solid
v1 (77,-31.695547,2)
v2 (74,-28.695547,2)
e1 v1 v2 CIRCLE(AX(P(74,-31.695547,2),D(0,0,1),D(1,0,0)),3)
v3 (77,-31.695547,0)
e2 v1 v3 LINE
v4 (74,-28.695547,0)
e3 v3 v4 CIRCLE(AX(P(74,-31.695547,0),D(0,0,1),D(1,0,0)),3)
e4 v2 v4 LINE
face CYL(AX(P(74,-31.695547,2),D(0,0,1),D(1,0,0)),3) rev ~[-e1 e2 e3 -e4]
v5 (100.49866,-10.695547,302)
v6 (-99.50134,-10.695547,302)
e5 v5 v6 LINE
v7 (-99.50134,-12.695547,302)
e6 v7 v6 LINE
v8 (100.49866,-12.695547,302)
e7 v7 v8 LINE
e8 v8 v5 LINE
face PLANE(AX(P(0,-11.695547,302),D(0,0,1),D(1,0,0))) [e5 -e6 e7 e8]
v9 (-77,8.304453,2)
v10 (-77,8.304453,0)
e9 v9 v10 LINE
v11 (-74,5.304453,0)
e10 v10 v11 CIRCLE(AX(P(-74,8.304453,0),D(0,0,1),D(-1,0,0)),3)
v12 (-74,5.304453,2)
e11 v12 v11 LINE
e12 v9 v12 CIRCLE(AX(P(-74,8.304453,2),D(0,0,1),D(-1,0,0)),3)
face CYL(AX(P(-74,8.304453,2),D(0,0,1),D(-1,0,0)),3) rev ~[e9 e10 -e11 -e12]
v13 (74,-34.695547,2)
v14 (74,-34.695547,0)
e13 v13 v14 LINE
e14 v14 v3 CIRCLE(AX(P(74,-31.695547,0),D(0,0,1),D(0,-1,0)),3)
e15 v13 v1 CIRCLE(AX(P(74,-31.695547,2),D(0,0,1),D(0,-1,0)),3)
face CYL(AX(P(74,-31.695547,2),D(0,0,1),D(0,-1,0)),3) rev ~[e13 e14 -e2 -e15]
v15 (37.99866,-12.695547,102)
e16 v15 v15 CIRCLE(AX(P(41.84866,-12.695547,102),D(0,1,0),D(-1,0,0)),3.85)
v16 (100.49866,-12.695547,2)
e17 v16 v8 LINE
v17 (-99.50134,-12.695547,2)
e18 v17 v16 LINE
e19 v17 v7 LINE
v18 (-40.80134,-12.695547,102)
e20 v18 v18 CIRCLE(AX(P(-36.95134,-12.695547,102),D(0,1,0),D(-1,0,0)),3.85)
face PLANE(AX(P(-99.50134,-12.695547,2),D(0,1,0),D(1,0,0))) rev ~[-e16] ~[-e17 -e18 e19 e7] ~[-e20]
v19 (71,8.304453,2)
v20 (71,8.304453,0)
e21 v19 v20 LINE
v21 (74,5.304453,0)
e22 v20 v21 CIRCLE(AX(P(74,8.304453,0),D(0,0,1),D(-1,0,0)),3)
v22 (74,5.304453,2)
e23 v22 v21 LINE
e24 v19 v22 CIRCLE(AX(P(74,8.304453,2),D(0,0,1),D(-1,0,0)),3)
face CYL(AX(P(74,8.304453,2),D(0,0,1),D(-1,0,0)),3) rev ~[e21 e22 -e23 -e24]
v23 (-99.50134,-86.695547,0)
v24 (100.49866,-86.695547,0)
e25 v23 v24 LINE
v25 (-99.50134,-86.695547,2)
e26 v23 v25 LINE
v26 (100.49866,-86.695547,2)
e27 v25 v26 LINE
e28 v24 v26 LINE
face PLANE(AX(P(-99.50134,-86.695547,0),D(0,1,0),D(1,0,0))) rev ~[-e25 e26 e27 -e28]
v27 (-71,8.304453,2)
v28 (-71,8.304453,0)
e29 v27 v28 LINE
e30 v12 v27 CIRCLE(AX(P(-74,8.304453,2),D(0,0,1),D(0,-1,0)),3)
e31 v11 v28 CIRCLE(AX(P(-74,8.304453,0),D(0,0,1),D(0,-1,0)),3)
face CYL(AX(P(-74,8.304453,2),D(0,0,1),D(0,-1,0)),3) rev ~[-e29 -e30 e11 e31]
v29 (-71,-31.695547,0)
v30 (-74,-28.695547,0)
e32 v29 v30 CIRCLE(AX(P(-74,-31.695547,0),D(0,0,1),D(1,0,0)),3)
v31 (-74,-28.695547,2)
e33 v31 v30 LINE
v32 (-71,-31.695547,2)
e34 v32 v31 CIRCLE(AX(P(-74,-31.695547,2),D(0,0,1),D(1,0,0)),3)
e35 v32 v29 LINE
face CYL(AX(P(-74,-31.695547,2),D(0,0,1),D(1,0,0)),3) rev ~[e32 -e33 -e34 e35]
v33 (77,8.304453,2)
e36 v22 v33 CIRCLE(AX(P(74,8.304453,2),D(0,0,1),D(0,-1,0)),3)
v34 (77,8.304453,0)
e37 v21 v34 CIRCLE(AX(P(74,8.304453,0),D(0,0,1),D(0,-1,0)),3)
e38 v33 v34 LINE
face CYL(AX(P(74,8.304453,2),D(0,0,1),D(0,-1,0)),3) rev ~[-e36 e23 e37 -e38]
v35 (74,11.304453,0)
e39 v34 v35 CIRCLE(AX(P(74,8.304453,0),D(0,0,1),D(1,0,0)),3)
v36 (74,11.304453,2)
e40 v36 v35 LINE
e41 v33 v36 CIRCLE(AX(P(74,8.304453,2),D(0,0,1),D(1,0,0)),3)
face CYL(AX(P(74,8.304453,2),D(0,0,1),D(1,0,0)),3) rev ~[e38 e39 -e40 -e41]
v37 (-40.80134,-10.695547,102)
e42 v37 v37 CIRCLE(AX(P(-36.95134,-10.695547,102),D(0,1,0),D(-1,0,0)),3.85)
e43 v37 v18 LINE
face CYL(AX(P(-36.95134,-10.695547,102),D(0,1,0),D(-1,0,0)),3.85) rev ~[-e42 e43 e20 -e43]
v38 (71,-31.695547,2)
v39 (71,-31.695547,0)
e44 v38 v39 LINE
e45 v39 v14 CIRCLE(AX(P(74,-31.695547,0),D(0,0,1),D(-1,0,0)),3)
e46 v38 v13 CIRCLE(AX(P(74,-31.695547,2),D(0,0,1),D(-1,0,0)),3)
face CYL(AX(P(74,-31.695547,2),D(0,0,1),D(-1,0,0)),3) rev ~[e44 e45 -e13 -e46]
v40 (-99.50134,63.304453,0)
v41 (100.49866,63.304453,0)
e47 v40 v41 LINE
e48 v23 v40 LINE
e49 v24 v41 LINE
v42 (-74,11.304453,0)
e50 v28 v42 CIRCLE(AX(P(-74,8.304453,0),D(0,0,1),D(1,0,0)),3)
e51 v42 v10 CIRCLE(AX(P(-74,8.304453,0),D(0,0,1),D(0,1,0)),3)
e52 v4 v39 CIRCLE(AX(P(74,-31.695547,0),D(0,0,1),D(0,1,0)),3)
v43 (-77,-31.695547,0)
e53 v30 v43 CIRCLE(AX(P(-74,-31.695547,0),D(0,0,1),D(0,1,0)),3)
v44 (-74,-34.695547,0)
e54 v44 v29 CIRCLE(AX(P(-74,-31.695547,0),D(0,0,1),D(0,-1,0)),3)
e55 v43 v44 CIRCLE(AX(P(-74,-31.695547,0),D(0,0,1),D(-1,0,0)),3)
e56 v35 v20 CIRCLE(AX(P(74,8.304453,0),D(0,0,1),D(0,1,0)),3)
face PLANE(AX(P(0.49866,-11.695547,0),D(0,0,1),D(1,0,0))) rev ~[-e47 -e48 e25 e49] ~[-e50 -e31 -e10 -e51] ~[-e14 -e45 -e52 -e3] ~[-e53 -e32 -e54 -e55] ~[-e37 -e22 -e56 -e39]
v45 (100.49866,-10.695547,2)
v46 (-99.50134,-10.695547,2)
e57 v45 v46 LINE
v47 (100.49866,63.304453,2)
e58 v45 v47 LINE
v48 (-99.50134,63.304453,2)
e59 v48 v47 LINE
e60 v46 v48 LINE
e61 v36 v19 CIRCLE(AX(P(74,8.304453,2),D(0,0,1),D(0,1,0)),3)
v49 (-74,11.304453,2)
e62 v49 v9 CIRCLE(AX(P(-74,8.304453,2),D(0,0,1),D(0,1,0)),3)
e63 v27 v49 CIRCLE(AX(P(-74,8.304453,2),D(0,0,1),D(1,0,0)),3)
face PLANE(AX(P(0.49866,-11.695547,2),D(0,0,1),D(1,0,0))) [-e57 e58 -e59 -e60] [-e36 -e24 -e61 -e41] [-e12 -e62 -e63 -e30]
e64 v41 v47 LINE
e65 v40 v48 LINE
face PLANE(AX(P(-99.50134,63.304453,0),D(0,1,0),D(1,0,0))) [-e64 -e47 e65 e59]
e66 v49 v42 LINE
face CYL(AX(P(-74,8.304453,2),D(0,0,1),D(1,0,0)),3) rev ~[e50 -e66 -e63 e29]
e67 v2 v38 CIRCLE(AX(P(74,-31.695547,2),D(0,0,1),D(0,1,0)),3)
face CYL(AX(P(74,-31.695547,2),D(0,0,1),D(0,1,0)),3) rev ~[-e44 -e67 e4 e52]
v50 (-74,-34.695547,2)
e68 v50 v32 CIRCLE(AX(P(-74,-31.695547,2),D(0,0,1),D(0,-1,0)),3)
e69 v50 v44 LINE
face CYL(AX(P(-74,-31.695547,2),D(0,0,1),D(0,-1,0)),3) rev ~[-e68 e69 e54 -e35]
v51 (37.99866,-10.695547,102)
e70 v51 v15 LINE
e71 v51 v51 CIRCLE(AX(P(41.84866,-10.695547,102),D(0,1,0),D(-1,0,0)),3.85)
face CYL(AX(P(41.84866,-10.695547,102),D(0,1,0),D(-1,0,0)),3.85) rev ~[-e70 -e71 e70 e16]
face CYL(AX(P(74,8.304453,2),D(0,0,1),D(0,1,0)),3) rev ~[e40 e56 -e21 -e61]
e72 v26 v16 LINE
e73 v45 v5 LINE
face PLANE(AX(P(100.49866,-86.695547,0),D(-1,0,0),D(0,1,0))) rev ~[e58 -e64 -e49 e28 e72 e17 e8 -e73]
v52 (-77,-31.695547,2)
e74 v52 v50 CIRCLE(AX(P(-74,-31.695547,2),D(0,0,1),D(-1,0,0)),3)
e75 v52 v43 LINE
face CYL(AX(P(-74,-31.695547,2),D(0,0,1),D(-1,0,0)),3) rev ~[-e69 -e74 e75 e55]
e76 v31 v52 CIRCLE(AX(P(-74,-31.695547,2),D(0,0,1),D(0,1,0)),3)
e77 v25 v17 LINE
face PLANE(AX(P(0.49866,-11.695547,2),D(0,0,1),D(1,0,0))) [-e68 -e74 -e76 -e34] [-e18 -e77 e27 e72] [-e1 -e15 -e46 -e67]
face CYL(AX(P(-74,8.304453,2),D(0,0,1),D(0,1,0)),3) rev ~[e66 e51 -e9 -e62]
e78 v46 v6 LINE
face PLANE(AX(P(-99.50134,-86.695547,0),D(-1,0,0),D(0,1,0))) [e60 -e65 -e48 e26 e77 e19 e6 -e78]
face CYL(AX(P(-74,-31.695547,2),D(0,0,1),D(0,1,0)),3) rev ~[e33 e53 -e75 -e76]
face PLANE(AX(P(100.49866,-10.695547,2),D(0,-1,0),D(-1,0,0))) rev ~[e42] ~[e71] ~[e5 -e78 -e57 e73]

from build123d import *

# Parameters (mm, degrees)
F0_W     = 200
F0_H     = 150
F1_DEPTH = 2
F2_W     = 148
F2_H     = 2
F2_W_2   = 25.5013404053
F3_DEPTH = 300
F5_DEPTH = 2.001
F6_R     = 3.85
F7_DEPTH = 2


with BuildPart() as f1:
    # F0 (on Top) → F1 (new body)
    with BuildSketch(Plane.XY):
        with Locations((0.4986595947, -11.6955466568)):
            Rectangle(F0_W, F0_H)
    extrude(amount=F1_DEPTH)

    # F2 (on face) → F3 (join)
    with BuildSketch(Plane.XY.offset(2)):
        with Locations((0, -11.6955466568)):
            Rectangle(F2_W, F2_H)
        Polygon((100.4986595947, -10.6955466568), (74, -10.6955466568), (74, -12.6955466568), (100.4986595947, -12.6955466568), (100.4986595947, -11.6955466568), align=None)
        with Locations((-86.7506702027, -11.6955466568)):
            Rectangle(F2_W_2, F2_H)
    extrude(amount=F3_DEPTH)

    # F2 (on face) → F5 (cut, through all)
    with BuildSketch(Plane.XY.offset(2)):
        with BuildLine():
            Line((-71, -31.6955466568), (-74, -31.6955466568))
            Line((-74, -31.6955466568), (-74, -34.6955466568))
            ThreePointArc((-74, -34.6955466568), (-71.8786796564, -33.8168670004), (-71, -31.6955466568))
        make_face()
        with BuildLine():
            ThreePointArc((-71, -31.6955466568), (-71.8786796564, -29.5742263133), (-74, -28.6955466568))
            Line((-74, -28.6955466568), (-74, -31.6955466568))
            Line((-74, -31.6955466568), (-71, -31.6955466568))
        make_face()
        with BuildLine():
            ThreePointArc((-74, -28.6955466568), (-76.1213203436, -29.5742263133), (-77, -31.6955466568))
            Line((-77, -31.6955466568), (-74, -31.6955466568))
            Line((-74, -31.6955466568), (-74, -28.6955466568))
        make_face()
        with BuildLine():
            Line((-74, -31.6955466568), (-77, -31.6955466568))
            ThreePointArc((-77, -31.6955466568), (-76.1213203436, -33.8168670004), (-74, -34.6955466568))
            Line((-74, -34.6955466568), (-74, -31.6955466568))
        make_face()
        with BuildLine():
            Line((74, -31.6955466568), (74, -28.6955466568))
            ThreePointArc((74, -28.6955466568), (71.8786796564, -29.5742263133), (71, -31.6955466568))
            Line((71, -31.6955466568), (74, -31.6955466568))
        make_face()
        with BuildLine():
            Line((74, -31.6955466568), (71, -31.6955466568))
            ThreePointArc((71, -31.6955466568), (71.8786796564, -33.8168670004), (74, -34.6955466568))
            Line((74, -34.6955466568), (74, -31.6955466568))
        make_face()
        with BuildLine():
            Line((77, -31.6955466568), (74, -31.6955466568))
            Line((74, -31.6955466568), (74, -34.6955466568))
            ThreePointArc((74, -34.6955466568), (76.1213203436, -33.8168670004), (77, -31.6955466568))
        make_face()
        with BuildLine():
            ThreePointArc((77, -31.6955466568), (76.1213203436, -29.5742263133), (74, -28.6955466568))
            Line((74, -28.6955466568), (74, -31.6955466568))
            Line((74, -31.6955466568), (77, -31.6955466568))
        make_face()
        with BuildLine():
            ThreePointArc((-71, 8.3044533432), (-71.8786796564, 10.4257736867), (-74, 11.3044533432))
            Line((-74, 11.3044533432), (-74, 8.3044533432))
            Line((-74, 8.3044533432), (-71, 8.3044533432))
        make_face()
        with BuildLine():
            Line((-71, 8.3044533432), (-74, 8.3044533432))
            Line((-74, 8.3044533432), (-74, 5.3044533432))
            ThreePointArc((-74, 5.3044533432), (-71.8786796564, 6.1831329996), (-71, 8.3044533432))
        make_face()
        with BuildLine():
            Line((-74, 8.3044533432), (-77, 8.3044533432))
            ThreePointArc((-77, 8.3044533432), (-76.1213203436, 6.1831329996), (-74, 5.3044533432))
            Line((-74, 5.3044533432), (-74, 8.3044533432))
        make_face()
        with BuildLine():
            ThreePointArc((-74, 11.3044533432), (-76.1213203436, 10.4257736867), (-77, 8.3044533432))
            Line((-77, 8.3044533432), (-74, 8.3044533432))
            Line((-74, 8.3044533432), (-74, 11.3044533432))
        make_face()
        with BuildLine():
            Line((77, 8.3044533432), (74, 8.3044533432))
            Line((74, 8.3044533432), (74, 5.3044533432))
            ThreePointArc((74, 5.3044533432), (76.1213203436, 6.1831329996), (77, 8.3044533432))
        make_face()
        with BuildLine():
            ThreePointArc((77, 8.3044533432), (76.1213203436, 10.4257736867), (74, 11.3044533432))
            Line((74, 11.3044533432), (74, 8.3044533432))
            Line((74, 8.3044533432), (77, 8.3044533432))
        make_face()
        with BuildLine():
            Line((74, 8.3044533432), (74, 11.3044533432))
            ThreePointArc((74, 11.3044533432), (71.8786796564, 10.4257736867), (71, 8.3044533432))
            Line((71, 8.3044533432), (74, 8.3044533432))
        make_face()
        with BuildLine():
            Line((74, 5.3044533432), (74, 8.3044533432))
            Line((74, 8.3044533432), (71, 8.3044533432))
            ThreePointArc((71, 8.3044533432), (71.8786796564, 6.1831329996), (74, 5.3044533432))
        make_face()
    extrude(amount=-F5_DEPTH, mode=Mode.SUBTRACT)

    # F6 (on face) → F7 (cut)
    with BuildSketch(Plane(origin=(0, -10.6955466568, 0), x_dir=(-1, 0, 0), z_dir=(0, 1, 0))):
        with Locations((-41.8486595947, 102)):
            Circle(F6_R)
        with Locations((36.9513404053, 102)):
            Circle(F6_R)
    extrude(amount=-F7_DEPTH, mode=Mode.SUBTRACT)


solid = f1.part
